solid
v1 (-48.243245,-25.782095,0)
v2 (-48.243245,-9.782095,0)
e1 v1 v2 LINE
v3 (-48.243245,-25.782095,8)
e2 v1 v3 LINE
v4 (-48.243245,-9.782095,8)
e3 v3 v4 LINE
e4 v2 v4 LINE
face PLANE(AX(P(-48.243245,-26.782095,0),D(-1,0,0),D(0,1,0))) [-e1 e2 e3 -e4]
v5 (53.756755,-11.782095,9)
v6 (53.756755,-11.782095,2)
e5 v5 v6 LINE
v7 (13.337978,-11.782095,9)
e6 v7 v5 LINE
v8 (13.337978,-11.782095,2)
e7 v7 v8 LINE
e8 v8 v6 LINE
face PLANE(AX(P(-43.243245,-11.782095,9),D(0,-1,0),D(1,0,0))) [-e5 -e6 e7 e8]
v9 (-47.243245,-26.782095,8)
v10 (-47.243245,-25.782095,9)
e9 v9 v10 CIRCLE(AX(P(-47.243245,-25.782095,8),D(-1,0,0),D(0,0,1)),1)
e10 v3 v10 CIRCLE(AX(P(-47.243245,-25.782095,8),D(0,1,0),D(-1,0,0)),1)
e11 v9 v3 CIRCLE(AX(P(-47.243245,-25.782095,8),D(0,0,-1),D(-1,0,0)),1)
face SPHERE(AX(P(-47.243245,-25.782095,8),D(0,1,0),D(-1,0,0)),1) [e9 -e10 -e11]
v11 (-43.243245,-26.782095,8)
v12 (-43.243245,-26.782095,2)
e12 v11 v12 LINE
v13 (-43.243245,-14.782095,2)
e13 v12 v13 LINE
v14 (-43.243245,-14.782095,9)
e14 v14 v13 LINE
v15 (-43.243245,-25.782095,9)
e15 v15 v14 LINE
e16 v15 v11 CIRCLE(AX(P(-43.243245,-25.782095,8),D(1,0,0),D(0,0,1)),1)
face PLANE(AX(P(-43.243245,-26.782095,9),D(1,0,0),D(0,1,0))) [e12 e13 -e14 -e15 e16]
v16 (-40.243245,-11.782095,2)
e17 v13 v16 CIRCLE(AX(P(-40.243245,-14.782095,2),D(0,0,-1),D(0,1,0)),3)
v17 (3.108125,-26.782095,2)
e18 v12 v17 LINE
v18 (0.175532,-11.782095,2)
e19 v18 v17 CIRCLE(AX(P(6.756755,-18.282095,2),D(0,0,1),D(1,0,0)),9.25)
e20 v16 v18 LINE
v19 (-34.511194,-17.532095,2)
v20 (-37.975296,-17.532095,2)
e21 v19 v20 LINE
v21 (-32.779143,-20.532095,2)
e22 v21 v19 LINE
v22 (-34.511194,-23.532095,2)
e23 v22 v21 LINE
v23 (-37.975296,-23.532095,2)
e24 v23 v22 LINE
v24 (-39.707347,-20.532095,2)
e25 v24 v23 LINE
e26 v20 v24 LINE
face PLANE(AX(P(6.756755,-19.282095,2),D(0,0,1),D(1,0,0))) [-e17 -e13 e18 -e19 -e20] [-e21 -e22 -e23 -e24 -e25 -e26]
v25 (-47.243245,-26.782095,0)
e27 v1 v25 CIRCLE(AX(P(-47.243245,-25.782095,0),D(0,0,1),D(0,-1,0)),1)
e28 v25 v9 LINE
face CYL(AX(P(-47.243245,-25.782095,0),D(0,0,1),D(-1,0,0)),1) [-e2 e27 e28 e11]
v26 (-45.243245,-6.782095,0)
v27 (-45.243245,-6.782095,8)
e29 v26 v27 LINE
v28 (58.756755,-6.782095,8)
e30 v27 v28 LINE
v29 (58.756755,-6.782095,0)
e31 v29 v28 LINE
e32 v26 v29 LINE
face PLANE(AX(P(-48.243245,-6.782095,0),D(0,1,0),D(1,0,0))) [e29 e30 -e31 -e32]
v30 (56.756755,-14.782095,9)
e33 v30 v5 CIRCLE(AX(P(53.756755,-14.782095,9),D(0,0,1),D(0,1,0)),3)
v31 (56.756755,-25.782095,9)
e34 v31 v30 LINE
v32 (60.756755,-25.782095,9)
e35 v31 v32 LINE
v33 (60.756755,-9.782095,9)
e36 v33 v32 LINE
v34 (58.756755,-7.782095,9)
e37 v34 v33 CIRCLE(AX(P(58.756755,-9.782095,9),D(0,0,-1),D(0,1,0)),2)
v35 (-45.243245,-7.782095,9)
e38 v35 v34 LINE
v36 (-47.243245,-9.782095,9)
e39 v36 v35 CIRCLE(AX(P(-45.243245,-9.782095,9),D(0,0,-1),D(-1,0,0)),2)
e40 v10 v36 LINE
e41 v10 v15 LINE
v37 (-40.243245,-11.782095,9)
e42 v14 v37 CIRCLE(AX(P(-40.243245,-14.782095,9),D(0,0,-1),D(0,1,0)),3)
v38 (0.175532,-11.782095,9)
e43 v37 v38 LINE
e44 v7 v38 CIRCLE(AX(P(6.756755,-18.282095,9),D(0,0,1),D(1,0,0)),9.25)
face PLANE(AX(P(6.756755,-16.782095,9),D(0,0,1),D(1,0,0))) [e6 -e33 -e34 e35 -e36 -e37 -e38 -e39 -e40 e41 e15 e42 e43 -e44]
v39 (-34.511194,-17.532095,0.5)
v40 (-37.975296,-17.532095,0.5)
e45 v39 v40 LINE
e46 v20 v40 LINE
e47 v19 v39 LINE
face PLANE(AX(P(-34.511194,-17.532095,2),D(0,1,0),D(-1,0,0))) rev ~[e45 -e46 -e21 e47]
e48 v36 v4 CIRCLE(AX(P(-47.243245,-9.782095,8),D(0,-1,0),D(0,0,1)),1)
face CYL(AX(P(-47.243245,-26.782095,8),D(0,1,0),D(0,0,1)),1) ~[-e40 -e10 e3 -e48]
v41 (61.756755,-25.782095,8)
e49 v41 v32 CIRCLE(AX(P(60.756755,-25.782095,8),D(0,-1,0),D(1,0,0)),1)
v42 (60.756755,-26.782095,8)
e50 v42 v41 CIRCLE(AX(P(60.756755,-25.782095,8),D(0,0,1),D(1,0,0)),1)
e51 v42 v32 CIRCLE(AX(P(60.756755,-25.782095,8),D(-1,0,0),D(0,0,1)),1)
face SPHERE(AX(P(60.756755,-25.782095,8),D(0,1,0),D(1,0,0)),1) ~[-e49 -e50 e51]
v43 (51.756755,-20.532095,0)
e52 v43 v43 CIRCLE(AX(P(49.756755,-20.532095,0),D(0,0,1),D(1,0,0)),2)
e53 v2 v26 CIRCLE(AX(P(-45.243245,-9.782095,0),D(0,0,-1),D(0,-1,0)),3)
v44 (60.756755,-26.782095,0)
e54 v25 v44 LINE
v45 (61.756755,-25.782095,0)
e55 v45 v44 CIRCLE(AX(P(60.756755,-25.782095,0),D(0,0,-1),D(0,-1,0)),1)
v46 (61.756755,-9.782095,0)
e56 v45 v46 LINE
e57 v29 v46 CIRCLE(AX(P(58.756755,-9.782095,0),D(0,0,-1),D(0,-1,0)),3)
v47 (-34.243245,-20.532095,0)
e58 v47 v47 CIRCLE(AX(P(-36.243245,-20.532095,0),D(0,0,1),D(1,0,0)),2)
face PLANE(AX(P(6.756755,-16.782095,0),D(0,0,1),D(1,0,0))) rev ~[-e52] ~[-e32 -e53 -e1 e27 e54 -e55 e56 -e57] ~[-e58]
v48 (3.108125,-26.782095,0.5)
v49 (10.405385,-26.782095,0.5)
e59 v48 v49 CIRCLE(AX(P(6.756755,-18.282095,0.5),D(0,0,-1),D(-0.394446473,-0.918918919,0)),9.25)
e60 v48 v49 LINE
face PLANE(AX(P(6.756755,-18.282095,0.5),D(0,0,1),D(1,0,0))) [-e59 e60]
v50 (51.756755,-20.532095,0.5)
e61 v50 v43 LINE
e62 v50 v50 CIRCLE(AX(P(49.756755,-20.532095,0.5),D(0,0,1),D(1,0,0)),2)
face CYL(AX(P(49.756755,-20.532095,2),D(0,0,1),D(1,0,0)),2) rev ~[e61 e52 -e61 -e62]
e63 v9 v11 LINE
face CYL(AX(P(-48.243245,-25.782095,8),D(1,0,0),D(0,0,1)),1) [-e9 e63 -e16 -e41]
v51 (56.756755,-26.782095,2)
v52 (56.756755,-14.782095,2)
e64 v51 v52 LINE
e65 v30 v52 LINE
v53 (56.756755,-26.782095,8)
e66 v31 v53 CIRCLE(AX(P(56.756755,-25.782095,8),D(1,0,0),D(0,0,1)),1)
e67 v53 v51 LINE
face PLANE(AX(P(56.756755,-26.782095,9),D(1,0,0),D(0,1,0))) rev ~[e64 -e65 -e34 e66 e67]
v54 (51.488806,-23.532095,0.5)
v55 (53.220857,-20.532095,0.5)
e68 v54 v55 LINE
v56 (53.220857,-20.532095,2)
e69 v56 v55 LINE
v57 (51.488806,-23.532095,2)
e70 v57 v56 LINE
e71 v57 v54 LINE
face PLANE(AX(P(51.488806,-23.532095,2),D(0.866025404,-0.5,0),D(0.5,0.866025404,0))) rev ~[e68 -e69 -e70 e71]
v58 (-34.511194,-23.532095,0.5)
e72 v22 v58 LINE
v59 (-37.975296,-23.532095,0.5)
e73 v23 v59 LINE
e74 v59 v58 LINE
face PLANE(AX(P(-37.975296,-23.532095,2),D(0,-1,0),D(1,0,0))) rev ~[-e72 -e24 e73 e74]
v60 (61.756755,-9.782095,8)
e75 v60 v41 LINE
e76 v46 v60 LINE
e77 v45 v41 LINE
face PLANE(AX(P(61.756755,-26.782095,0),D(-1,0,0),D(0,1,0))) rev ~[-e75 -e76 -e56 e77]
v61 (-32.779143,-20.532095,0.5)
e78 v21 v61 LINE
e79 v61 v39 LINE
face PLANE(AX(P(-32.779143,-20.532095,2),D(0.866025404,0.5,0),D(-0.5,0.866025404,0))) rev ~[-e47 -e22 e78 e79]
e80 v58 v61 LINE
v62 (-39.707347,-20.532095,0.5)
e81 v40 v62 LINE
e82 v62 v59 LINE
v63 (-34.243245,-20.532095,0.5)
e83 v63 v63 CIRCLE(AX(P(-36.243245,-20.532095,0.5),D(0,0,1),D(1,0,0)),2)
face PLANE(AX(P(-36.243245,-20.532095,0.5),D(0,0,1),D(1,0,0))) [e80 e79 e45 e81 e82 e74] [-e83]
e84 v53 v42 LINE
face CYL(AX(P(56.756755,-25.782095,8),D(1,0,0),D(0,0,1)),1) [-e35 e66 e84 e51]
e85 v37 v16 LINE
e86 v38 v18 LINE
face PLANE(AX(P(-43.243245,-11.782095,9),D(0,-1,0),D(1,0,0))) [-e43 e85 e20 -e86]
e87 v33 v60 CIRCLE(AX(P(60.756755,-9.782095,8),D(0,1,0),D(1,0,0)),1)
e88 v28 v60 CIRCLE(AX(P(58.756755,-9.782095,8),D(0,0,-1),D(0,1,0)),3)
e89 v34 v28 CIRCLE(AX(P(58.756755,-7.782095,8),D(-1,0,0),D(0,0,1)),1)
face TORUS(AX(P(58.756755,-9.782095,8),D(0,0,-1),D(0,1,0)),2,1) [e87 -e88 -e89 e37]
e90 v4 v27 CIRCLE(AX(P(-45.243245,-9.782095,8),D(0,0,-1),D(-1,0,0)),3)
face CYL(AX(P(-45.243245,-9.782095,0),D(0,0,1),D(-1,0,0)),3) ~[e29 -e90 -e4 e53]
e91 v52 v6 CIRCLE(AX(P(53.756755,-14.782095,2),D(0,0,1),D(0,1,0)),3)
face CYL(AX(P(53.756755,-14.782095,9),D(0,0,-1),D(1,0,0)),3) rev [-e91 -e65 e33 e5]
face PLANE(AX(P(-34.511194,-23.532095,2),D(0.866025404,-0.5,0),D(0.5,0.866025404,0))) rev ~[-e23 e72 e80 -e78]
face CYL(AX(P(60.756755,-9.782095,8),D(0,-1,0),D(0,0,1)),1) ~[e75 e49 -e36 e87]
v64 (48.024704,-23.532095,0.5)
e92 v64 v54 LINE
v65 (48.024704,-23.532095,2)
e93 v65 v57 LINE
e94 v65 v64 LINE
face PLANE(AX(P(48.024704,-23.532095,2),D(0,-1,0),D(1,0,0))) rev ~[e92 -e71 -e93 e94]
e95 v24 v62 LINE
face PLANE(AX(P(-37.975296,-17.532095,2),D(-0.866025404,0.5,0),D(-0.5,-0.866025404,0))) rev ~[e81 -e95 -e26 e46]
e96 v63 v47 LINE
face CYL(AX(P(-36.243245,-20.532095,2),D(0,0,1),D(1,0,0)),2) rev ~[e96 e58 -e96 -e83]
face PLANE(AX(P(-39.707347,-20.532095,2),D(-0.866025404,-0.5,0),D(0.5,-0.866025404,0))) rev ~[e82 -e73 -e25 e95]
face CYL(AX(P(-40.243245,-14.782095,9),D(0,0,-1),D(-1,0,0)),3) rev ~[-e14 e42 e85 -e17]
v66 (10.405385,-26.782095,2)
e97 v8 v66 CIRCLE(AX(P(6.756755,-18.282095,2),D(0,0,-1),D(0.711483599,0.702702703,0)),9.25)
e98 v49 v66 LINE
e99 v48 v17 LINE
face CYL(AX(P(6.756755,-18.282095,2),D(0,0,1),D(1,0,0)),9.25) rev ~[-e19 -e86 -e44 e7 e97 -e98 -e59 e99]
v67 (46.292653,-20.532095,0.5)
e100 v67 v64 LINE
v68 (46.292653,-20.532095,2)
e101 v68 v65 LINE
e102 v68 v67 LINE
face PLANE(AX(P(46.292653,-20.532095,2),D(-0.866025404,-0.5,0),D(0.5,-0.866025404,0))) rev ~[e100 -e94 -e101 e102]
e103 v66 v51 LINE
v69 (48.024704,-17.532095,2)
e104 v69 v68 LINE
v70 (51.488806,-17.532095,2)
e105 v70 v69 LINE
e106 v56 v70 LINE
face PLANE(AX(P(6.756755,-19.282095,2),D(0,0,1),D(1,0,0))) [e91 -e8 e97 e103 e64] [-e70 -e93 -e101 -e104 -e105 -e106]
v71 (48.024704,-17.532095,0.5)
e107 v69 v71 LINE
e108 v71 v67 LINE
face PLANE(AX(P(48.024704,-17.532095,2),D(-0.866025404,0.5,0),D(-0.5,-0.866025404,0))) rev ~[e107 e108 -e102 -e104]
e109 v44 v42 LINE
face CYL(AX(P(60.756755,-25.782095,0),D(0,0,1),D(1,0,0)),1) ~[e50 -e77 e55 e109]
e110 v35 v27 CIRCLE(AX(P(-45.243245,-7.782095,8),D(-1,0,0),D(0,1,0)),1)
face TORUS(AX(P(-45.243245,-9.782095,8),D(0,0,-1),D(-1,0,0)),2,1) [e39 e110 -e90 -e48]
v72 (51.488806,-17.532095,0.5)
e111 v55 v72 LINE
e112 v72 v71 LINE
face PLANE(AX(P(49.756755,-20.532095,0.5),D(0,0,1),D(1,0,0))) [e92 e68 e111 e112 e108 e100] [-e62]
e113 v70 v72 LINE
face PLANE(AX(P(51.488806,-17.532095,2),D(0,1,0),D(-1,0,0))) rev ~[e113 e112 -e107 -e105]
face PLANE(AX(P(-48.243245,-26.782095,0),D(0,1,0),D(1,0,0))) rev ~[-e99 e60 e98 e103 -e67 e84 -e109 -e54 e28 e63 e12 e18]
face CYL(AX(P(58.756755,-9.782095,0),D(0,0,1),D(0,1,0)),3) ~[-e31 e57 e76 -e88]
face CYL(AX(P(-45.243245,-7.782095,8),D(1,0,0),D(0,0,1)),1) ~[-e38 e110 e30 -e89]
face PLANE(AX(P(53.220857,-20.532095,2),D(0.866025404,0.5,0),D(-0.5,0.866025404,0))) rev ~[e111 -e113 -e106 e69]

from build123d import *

# Parameters (mm, degrees)
F0_W           = 110
F0_H           = 20
F1_DEPTH       = 9
F2_W           = 100
F2_H           = 15
F3_DEPTH       = 7
F4_R           = 3
F5_R           = 2
F6_DEPTH       = 20
F8_DEPTH       = 1.5
F9_R           = 9.25
F10_DEPTH      = 1.5
F10_DEPTH_BACK = 7
F11_R          = 1


with BuildPart() as f1:
    # F0 (on Top) → F1 (new body)
    with BuildSketch(Plane.XY):
        with Locations((6.7567551136, -16.7820947109)):
            Rectangle(F0_W, F0_H)
    extrude(amount=F1_DEPTH)

    # F2 (on face) → F3 (cut)
    with BuildSketch(Plane.XY.offset(9)):
        with Locations((6.7567551136, -19.2820947109)):
            Rectangle(F2_W, F2_H)
    extrude(amount=-F3_DEPTH, mode=Mode.SUBTRACT)

    # F4
    f4_edges = [f1.edges().sort_by_distance(p)[0] for p in [
        (-43.243245, -11.782095, 5.5),
        (56.756755, -11.782095, 5.5),
        (-48.243245, -6.782095, 4.5),
        (61.756755, -6.782095, 4.5),
    ]]
    fillet(f4_edges, radius=F4_R)

    # F5 (on face) → F6 (cut)
    with BuildSketch(Plane.XY.offset(2)):
        with Locations((49.7567551136, -20.5320947109)):
            Circle(F5_R)
        with Locations((-36.2432448864, -20.5320947109)):
            Circle(F5_R)
    extrude(amount=-F6_DEPTH, mode=Mode.SUBTRACT)

    # F7 (on face) → F8 (cut)
    with BuildSketch(Plane.XY.offset(2)):
        Polygon((-34.5111940788, -17.5320947109), (-37.975295694, -17.5320947109), (-39.7073465015, -20.5320947109), (-37.975295694, -23.5320947109), (-34.5111940788, -23.5320947109), (-32.7791432713, -20.5320947109), align=None)
        Polygon((53.2208567287, -20.5320947109), (51.4888059212, -17.5320947109), (48.024704306, -17.5320947109), (46.2926534985, -20.5320947109), (48.024704306, -23.5320947109), (51.4888059212, -23.5320947109), align=None)
    extrude(amount=-F8_DEPTH, mode=Mode.SUBTRACT)

    # F9 (on face) → F10 (cut, two sides)
    with BuildSketch(Plane.XY.offset(2)) as f10_sk:
        with Locations((6.7567551136, -18.2820947109)):
            Circle(F9_R)
    extrude(amount=-F10_DEPTH, mode=Mode.SUBTRACT)
    extrude(f10_sk.sketch, amount=F10_DEPTH_BACK, mode=Mode.SUBTRACT)

    # F11
    f11_edges = [f1.edges().sort_by_distance(p)[0] for p in [
        (6.756755, -6.782095, 9),
        (-48.243245, -26.782095, 4.5),
        (61.756755, -26.782095, 4.5),
        (59.256755, -26.782095, 9),
        (-45.743245, -26.782095, 9),
    ]]
    fillet(f11_edges, radius=F11_R)


solid = f1.part
